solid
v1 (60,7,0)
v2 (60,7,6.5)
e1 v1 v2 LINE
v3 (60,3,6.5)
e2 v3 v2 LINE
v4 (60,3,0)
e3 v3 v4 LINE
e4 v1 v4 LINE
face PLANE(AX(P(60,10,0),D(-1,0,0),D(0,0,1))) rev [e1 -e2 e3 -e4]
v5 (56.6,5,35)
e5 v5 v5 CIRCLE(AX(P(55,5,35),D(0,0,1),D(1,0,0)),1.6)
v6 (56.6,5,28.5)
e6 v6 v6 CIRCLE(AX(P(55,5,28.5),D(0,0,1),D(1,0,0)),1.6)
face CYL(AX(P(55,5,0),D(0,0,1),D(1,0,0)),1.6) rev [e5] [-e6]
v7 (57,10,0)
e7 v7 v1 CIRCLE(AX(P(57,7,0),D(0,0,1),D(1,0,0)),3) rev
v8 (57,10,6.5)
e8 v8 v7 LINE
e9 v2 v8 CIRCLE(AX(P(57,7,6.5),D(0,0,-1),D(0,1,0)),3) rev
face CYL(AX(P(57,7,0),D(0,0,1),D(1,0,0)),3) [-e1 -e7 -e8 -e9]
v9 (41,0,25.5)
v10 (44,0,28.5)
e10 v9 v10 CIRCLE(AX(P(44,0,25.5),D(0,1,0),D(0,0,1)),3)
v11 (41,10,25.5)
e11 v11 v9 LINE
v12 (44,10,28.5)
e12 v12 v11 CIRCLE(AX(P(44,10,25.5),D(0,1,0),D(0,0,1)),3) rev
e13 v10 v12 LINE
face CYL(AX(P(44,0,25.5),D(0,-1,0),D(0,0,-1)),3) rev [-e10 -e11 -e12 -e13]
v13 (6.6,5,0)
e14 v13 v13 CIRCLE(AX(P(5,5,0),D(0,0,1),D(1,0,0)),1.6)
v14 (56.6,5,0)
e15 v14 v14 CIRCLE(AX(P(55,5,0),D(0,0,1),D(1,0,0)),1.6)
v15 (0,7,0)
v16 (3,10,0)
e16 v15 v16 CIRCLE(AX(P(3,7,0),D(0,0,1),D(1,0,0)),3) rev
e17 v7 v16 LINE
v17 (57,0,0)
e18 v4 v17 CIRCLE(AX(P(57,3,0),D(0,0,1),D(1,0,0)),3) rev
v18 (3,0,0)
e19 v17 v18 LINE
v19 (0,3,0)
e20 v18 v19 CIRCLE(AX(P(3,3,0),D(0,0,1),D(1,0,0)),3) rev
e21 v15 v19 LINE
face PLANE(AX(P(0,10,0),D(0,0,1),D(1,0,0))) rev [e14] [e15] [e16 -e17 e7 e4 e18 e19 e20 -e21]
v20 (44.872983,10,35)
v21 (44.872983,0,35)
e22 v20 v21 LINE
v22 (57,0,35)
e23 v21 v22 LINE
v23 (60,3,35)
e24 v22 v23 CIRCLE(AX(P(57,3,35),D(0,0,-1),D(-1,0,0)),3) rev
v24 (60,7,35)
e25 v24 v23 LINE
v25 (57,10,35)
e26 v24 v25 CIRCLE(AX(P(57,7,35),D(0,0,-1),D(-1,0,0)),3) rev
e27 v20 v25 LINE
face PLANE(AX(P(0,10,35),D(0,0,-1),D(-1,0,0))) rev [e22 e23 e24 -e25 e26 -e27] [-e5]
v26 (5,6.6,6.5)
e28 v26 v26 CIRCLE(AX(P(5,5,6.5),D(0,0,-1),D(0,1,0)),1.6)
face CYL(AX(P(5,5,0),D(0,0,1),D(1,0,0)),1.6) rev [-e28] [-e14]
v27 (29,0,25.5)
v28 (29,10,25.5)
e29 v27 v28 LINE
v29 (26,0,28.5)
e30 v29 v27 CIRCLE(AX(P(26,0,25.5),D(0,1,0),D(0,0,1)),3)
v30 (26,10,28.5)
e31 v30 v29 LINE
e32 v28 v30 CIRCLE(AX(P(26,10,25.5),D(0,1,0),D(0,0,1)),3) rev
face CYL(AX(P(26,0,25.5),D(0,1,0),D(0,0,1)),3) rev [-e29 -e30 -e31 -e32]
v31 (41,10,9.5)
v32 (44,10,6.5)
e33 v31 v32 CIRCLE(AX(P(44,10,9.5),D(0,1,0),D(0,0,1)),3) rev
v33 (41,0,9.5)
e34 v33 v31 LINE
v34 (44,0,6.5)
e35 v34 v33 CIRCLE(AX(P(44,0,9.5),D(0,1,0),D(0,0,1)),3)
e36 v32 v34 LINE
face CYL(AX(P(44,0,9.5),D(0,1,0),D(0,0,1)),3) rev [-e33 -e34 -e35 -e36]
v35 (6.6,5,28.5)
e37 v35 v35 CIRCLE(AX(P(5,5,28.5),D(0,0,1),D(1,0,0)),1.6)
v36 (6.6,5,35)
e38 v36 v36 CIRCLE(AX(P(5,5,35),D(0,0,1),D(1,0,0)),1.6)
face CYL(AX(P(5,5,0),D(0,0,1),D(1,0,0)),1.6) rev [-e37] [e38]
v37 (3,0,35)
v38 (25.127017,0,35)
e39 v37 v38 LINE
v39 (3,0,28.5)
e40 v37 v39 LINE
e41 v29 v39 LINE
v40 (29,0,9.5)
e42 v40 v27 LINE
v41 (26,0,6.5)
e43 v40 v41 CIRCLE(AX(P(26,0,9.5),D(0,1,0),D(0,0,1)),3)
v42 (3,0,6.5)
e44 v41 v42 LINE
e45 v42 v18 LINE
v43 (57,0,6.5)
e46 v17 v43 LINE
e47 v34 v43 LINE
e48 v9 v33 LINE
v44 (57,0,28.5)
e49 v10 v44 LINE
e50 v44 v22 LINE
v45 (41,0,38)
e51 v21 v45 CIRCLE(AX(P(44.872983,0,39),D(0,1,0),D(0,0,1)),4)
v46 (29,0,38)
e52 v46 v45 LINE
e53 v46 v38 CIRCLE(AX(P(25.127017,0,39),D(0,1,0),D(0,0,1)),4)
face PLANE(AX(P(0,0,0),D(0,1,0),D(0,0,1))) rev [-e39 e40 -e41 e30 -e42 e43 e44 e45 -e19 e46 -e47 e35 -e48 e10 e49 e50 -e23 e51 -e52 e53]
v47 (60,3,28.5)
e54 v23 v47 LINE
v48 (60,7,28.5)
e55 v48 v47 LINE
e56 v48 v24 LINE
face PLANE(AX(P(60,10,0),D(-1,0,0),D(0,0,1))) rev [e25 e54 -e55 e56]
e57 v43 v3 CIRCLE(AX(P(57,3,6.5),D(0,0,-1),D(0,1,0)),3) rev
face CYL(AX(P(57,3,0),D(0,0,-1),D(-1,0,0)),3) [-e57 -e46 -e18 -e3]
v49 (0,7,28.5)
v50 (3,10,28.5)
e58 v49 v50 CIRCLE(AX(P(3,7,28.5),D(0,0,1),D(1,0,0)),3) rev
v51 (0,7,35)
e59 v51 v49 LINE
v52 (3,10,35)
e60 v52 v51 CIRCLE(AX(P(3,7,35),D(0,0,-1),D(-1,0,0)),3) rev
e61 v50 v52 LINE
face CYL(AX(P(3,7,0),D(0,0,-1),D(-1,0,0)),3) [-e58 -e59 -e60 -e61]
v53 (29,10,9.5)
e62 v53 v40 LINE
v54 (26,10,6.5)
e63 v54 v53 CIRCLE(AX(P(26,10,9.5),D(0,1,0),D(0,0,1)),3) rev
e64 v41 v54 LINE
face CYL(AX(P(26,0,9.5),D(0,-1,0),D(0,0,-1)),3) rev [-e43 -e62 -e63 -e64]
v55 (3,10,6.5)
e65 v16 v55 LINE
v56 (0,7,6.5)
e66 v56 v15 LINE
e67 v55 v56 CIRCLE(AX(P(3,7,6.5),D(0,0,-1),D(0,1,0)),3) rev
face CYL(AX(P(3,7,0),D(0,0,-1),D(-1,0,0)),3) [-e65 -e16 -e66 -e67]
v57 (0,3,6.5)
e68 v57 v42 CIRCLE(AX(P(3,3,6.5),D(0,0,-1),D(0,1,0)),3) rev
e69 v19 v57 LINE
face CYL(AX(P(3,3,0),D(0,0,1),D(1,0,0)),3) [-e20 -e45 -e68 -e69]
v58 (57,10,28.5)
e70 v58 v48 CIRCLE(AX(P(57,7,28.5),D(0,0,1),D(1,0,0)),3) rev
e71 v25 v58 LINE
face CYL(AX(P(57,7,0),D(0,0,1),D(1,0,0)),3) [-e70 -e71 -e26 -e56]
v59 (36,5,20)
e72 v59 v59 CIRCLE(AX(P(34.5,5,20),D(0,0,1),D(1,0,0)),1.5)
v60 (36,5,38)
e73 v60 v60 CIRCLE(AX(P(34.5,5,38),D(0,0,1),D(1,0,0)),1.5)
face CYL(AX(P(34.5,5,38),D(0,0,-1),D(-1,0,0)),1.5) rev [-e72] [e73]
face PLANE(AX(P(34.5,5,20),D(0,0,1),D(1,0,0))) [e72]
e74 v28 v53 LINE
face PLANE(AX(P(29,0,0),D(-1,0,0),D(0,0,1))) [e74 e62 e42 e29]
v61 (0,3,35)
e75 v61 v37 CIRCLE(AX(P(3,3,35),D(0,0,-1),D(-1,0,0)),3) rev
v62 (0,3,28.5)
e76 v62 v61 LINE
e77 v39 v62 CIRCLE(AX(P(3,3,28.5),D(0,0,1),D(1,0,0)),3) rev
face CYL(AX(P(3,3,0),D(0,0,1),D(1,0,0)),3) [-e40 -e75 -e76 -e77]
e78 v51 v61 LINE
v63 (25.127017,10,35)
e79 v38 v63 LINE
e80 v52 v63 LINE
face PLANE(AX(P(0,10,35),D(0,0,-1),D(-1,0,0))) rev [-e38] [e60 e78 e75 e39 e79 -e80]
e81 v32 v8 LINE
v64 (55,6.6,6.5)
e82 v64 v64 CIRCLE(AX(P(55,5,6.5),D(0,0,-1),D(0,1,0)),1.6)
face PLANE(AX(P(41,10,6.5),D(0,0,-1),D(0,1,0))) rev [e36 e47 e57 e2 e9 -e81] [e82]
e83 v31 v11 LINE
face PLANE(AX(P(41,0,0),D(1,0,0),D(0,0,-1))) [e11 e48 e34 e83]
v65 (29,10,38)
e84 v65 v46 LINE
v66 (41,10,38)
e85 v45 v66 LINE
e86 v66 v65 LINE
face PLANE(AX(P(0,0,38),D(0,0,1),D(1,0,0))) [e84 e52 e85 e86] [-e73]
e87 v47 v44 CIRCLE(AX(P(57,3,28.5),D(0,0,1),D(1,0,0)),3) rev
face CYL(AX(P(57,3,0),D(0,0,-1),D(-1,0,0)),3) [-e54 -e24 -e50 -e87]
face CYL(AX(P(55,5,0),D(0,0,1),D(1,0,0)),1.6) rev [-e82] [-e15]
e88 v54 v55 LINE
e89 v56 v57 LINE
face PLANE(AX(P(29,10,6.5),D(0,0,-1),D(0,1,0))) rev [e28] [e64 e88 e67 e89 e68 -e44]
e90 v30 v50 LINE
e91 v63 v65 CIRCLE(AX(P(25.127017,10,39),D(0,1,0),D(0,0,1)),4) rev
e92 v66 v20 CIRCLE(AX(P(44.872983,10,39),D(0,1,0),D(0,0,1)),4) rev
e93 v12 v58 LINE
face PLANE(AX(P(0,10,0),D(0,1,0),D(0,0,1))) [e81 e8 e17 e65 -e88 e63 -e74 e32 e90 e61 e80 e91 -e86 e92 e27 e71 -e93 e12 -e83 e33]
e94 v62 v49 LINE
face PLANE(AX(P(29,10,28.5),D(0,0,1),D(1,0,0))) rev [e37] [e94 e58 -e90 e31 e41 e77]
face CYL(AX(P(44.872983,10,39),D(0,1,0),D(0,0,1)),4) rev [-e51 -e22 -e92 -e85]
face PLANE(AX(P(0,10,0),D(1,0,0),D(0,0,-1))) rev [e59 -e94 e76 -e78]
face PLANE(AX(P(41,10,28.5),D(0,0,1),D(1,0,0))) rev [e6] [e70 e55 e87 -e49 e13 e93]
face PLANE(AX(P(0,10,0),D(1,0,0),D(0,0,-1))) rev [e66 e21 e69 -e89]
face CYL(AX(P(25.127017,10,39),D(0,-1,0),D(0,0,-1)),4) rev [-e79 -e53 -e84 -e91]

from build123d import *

# Parameters (mm, degrees)
SKETCH1_W               = 60
SKETCH1_H               = 35
BOSS_EXTRUDE1_DEPTH     = 10
SKETCH2_W               = 22
SKETCH2_H               = 10
CUT_EXTRUDE1_DEPTH      = 19
SKETCH3_W               = 22
SKETCH3_H               = 10
CUT_EXTRUDE2_DEPTH      = 29
SKETCH5_R               = 1.6
CUT_EXTRUDE4_DEPTH      = 71.178344238
FILLET1_R               = 3
FILLET2_R               = 3
SKETCH7_W               = 12
SKETCH7_H               = 10
BOSS_EXTRUDE2_DEPTH     = 3
CUT_EXTRUDE5_DEPTH      = 3
CUT_EXTRUDE5_DEPTH_BACK = 15
SKETCH6_R               = 1.5
FILLET3_R               = 4


with BuildPart() as part:
    # Sketch1 → Boss-Extrude1 (new body)
    with BuildSketch(Plane(origin=(0, 0, 0), x_dir=(1, 0, 0), z_dir=(0, 1, 0))):
        with Locations((30, -17.5)):
            Rectangle(SKETCH1_W, SKETCH1_H)
    extrude(amount=BOSS_EXTRUDE1_DEPTH)

    # Sketch2 → Cut-Extrude1 (cut)
    with BuildSketch(Plane(origin=(60, 0, 0), x_dir=(0, 0, -1), z_dir=(1, 0, 0))):
        with Locations((-17.5, 5)):
            Rectangle(SKETCH2_W, SKETCH2_H)
    extrude(amount=-CUT_EXTRUDE1_DEPTH, mode=Mode.SUBTRACT)

    # Sketch3 → Cut-Extrude2 (cut)
    with BuildSketch(Plane.ZY):
        with Locations((17.5, 5)):
            Rectangle(SKETCH3_W, SKETCH3_H)
    extrude(amount=-CUT_EXTRUDE2_DEPTH, mode=Mode.SUBTRACT)

    # Sketch5 → Cut-Extrude4 (cut, through all)
    with BuildSketch(Plane.XY.offset(35)):
        with Locations((5, 5)):
            Circle(SKETCH5_R)
        with Locations((55, 5)):
            Circle(SKETCH5_R)
    extrude(amount=-CUT_EXTRUDE4_DEPTH, mode=Mode.SUBTRACT)

    # Fillet1
    fillet1_edges = [part.edges().sort_by_distance(p)[0] for p in [
        (60, 10, 31.75),
        (60, 0, 3.25),
        (60, 10, 3.25),
        (0, 0, 31.75),
        (0, 10, 31.75),
        (0, 10, 3.25),
        (60, 0, 31.75),
        (0, 0, 3.25),
    ]]
    fillet(fillet1_edges, radius=FILLET1_R)

    # Fillet2
    fillet2_edges = [part.edges().sort_by_distance(p)[0] for p in [
        (41, 5, 28.5),
        (41, 5, 6.5),
        (29, 5, 6.5),
        (29, 5, 28.5),
    ]]
    fillet(fillet2_edges, radius=FILLET2_R)

    # Sketch7 → Boss-Extrude2 (add)
    with BuildSketch(Plane.XY.offset(35)):
        with Locations((35, 5)):
            Rectangle(SKETCH7_W, SKETCH7_H)
    extrude(amount=BOSS_EXTRUDE2_DEPTH)

    # Sketch6 → Cut-Extrude5 (cut, two sides: drawn at the far end of the back side and taken through both)
    with BuildSketch(Plane.XY.offset(35).offset(-CUT_EXTRUDE5_DEPTH_BACK)):
        with Locations((34.5, 5)):
            Circle(SKETCH6_R)
    extrude(amount=CUT_EXTRUDE5_DEPTH + CUT_EXTRUDE5_DEPTH_BACK, mode=Mode.SUBTRACT)

    # Fillet3
    # the kernel refuses this fillet: 4 mm, written as the material it adds along each edge
    with BuildSketch(Plane(origin=(41, 10, 35), x_dir=(0, 0, 1), z_dir=(0, -1, 0))) as fillet3_piece_1:
        with BuildLine():
            CenterArc((4, -3.872983346), FILLET3_R, 104.477512186, 75.522487814)
            Line((0, -3.872983346), (-0.08, -3.872983346))
            Line((-0.08, -3.872983346), (-0.08, 0))
            Line((-0.08, 0), (0, 0.08))
            ThreePointArc((0, 0.08), (1.5, 0.08), (2.98, 0.077459667))
            Line((2.98, 0.077459667), (3, 0))
        make_face()
    extrude(amount=10)
    with BuildSketch(Plane(origin=(29, 0, 35), x_dir=(-1, 0, 0), z_dir=(0, 1, 0))) as fillet3_piece_2:
        with BuildLine():
            CenterArc((3.872983346, 4), FILLET3_R, 194.477512186, 75.522487814)
            Line((0, 3), (-0.077459667, 2.98))
            ThreePointArc((-0.077459667, 2.98), (-0.08, 1.5), (-0.08, 0))
            Line((-0.08, 0), (0, -0.08))
            Line((0, -0.08), (3.872983346, -0.08))
            Line((3.872983346, -0.08), (3.872983346, 0))
        make_face()
    extrude(amount=10)


solid = part.part
